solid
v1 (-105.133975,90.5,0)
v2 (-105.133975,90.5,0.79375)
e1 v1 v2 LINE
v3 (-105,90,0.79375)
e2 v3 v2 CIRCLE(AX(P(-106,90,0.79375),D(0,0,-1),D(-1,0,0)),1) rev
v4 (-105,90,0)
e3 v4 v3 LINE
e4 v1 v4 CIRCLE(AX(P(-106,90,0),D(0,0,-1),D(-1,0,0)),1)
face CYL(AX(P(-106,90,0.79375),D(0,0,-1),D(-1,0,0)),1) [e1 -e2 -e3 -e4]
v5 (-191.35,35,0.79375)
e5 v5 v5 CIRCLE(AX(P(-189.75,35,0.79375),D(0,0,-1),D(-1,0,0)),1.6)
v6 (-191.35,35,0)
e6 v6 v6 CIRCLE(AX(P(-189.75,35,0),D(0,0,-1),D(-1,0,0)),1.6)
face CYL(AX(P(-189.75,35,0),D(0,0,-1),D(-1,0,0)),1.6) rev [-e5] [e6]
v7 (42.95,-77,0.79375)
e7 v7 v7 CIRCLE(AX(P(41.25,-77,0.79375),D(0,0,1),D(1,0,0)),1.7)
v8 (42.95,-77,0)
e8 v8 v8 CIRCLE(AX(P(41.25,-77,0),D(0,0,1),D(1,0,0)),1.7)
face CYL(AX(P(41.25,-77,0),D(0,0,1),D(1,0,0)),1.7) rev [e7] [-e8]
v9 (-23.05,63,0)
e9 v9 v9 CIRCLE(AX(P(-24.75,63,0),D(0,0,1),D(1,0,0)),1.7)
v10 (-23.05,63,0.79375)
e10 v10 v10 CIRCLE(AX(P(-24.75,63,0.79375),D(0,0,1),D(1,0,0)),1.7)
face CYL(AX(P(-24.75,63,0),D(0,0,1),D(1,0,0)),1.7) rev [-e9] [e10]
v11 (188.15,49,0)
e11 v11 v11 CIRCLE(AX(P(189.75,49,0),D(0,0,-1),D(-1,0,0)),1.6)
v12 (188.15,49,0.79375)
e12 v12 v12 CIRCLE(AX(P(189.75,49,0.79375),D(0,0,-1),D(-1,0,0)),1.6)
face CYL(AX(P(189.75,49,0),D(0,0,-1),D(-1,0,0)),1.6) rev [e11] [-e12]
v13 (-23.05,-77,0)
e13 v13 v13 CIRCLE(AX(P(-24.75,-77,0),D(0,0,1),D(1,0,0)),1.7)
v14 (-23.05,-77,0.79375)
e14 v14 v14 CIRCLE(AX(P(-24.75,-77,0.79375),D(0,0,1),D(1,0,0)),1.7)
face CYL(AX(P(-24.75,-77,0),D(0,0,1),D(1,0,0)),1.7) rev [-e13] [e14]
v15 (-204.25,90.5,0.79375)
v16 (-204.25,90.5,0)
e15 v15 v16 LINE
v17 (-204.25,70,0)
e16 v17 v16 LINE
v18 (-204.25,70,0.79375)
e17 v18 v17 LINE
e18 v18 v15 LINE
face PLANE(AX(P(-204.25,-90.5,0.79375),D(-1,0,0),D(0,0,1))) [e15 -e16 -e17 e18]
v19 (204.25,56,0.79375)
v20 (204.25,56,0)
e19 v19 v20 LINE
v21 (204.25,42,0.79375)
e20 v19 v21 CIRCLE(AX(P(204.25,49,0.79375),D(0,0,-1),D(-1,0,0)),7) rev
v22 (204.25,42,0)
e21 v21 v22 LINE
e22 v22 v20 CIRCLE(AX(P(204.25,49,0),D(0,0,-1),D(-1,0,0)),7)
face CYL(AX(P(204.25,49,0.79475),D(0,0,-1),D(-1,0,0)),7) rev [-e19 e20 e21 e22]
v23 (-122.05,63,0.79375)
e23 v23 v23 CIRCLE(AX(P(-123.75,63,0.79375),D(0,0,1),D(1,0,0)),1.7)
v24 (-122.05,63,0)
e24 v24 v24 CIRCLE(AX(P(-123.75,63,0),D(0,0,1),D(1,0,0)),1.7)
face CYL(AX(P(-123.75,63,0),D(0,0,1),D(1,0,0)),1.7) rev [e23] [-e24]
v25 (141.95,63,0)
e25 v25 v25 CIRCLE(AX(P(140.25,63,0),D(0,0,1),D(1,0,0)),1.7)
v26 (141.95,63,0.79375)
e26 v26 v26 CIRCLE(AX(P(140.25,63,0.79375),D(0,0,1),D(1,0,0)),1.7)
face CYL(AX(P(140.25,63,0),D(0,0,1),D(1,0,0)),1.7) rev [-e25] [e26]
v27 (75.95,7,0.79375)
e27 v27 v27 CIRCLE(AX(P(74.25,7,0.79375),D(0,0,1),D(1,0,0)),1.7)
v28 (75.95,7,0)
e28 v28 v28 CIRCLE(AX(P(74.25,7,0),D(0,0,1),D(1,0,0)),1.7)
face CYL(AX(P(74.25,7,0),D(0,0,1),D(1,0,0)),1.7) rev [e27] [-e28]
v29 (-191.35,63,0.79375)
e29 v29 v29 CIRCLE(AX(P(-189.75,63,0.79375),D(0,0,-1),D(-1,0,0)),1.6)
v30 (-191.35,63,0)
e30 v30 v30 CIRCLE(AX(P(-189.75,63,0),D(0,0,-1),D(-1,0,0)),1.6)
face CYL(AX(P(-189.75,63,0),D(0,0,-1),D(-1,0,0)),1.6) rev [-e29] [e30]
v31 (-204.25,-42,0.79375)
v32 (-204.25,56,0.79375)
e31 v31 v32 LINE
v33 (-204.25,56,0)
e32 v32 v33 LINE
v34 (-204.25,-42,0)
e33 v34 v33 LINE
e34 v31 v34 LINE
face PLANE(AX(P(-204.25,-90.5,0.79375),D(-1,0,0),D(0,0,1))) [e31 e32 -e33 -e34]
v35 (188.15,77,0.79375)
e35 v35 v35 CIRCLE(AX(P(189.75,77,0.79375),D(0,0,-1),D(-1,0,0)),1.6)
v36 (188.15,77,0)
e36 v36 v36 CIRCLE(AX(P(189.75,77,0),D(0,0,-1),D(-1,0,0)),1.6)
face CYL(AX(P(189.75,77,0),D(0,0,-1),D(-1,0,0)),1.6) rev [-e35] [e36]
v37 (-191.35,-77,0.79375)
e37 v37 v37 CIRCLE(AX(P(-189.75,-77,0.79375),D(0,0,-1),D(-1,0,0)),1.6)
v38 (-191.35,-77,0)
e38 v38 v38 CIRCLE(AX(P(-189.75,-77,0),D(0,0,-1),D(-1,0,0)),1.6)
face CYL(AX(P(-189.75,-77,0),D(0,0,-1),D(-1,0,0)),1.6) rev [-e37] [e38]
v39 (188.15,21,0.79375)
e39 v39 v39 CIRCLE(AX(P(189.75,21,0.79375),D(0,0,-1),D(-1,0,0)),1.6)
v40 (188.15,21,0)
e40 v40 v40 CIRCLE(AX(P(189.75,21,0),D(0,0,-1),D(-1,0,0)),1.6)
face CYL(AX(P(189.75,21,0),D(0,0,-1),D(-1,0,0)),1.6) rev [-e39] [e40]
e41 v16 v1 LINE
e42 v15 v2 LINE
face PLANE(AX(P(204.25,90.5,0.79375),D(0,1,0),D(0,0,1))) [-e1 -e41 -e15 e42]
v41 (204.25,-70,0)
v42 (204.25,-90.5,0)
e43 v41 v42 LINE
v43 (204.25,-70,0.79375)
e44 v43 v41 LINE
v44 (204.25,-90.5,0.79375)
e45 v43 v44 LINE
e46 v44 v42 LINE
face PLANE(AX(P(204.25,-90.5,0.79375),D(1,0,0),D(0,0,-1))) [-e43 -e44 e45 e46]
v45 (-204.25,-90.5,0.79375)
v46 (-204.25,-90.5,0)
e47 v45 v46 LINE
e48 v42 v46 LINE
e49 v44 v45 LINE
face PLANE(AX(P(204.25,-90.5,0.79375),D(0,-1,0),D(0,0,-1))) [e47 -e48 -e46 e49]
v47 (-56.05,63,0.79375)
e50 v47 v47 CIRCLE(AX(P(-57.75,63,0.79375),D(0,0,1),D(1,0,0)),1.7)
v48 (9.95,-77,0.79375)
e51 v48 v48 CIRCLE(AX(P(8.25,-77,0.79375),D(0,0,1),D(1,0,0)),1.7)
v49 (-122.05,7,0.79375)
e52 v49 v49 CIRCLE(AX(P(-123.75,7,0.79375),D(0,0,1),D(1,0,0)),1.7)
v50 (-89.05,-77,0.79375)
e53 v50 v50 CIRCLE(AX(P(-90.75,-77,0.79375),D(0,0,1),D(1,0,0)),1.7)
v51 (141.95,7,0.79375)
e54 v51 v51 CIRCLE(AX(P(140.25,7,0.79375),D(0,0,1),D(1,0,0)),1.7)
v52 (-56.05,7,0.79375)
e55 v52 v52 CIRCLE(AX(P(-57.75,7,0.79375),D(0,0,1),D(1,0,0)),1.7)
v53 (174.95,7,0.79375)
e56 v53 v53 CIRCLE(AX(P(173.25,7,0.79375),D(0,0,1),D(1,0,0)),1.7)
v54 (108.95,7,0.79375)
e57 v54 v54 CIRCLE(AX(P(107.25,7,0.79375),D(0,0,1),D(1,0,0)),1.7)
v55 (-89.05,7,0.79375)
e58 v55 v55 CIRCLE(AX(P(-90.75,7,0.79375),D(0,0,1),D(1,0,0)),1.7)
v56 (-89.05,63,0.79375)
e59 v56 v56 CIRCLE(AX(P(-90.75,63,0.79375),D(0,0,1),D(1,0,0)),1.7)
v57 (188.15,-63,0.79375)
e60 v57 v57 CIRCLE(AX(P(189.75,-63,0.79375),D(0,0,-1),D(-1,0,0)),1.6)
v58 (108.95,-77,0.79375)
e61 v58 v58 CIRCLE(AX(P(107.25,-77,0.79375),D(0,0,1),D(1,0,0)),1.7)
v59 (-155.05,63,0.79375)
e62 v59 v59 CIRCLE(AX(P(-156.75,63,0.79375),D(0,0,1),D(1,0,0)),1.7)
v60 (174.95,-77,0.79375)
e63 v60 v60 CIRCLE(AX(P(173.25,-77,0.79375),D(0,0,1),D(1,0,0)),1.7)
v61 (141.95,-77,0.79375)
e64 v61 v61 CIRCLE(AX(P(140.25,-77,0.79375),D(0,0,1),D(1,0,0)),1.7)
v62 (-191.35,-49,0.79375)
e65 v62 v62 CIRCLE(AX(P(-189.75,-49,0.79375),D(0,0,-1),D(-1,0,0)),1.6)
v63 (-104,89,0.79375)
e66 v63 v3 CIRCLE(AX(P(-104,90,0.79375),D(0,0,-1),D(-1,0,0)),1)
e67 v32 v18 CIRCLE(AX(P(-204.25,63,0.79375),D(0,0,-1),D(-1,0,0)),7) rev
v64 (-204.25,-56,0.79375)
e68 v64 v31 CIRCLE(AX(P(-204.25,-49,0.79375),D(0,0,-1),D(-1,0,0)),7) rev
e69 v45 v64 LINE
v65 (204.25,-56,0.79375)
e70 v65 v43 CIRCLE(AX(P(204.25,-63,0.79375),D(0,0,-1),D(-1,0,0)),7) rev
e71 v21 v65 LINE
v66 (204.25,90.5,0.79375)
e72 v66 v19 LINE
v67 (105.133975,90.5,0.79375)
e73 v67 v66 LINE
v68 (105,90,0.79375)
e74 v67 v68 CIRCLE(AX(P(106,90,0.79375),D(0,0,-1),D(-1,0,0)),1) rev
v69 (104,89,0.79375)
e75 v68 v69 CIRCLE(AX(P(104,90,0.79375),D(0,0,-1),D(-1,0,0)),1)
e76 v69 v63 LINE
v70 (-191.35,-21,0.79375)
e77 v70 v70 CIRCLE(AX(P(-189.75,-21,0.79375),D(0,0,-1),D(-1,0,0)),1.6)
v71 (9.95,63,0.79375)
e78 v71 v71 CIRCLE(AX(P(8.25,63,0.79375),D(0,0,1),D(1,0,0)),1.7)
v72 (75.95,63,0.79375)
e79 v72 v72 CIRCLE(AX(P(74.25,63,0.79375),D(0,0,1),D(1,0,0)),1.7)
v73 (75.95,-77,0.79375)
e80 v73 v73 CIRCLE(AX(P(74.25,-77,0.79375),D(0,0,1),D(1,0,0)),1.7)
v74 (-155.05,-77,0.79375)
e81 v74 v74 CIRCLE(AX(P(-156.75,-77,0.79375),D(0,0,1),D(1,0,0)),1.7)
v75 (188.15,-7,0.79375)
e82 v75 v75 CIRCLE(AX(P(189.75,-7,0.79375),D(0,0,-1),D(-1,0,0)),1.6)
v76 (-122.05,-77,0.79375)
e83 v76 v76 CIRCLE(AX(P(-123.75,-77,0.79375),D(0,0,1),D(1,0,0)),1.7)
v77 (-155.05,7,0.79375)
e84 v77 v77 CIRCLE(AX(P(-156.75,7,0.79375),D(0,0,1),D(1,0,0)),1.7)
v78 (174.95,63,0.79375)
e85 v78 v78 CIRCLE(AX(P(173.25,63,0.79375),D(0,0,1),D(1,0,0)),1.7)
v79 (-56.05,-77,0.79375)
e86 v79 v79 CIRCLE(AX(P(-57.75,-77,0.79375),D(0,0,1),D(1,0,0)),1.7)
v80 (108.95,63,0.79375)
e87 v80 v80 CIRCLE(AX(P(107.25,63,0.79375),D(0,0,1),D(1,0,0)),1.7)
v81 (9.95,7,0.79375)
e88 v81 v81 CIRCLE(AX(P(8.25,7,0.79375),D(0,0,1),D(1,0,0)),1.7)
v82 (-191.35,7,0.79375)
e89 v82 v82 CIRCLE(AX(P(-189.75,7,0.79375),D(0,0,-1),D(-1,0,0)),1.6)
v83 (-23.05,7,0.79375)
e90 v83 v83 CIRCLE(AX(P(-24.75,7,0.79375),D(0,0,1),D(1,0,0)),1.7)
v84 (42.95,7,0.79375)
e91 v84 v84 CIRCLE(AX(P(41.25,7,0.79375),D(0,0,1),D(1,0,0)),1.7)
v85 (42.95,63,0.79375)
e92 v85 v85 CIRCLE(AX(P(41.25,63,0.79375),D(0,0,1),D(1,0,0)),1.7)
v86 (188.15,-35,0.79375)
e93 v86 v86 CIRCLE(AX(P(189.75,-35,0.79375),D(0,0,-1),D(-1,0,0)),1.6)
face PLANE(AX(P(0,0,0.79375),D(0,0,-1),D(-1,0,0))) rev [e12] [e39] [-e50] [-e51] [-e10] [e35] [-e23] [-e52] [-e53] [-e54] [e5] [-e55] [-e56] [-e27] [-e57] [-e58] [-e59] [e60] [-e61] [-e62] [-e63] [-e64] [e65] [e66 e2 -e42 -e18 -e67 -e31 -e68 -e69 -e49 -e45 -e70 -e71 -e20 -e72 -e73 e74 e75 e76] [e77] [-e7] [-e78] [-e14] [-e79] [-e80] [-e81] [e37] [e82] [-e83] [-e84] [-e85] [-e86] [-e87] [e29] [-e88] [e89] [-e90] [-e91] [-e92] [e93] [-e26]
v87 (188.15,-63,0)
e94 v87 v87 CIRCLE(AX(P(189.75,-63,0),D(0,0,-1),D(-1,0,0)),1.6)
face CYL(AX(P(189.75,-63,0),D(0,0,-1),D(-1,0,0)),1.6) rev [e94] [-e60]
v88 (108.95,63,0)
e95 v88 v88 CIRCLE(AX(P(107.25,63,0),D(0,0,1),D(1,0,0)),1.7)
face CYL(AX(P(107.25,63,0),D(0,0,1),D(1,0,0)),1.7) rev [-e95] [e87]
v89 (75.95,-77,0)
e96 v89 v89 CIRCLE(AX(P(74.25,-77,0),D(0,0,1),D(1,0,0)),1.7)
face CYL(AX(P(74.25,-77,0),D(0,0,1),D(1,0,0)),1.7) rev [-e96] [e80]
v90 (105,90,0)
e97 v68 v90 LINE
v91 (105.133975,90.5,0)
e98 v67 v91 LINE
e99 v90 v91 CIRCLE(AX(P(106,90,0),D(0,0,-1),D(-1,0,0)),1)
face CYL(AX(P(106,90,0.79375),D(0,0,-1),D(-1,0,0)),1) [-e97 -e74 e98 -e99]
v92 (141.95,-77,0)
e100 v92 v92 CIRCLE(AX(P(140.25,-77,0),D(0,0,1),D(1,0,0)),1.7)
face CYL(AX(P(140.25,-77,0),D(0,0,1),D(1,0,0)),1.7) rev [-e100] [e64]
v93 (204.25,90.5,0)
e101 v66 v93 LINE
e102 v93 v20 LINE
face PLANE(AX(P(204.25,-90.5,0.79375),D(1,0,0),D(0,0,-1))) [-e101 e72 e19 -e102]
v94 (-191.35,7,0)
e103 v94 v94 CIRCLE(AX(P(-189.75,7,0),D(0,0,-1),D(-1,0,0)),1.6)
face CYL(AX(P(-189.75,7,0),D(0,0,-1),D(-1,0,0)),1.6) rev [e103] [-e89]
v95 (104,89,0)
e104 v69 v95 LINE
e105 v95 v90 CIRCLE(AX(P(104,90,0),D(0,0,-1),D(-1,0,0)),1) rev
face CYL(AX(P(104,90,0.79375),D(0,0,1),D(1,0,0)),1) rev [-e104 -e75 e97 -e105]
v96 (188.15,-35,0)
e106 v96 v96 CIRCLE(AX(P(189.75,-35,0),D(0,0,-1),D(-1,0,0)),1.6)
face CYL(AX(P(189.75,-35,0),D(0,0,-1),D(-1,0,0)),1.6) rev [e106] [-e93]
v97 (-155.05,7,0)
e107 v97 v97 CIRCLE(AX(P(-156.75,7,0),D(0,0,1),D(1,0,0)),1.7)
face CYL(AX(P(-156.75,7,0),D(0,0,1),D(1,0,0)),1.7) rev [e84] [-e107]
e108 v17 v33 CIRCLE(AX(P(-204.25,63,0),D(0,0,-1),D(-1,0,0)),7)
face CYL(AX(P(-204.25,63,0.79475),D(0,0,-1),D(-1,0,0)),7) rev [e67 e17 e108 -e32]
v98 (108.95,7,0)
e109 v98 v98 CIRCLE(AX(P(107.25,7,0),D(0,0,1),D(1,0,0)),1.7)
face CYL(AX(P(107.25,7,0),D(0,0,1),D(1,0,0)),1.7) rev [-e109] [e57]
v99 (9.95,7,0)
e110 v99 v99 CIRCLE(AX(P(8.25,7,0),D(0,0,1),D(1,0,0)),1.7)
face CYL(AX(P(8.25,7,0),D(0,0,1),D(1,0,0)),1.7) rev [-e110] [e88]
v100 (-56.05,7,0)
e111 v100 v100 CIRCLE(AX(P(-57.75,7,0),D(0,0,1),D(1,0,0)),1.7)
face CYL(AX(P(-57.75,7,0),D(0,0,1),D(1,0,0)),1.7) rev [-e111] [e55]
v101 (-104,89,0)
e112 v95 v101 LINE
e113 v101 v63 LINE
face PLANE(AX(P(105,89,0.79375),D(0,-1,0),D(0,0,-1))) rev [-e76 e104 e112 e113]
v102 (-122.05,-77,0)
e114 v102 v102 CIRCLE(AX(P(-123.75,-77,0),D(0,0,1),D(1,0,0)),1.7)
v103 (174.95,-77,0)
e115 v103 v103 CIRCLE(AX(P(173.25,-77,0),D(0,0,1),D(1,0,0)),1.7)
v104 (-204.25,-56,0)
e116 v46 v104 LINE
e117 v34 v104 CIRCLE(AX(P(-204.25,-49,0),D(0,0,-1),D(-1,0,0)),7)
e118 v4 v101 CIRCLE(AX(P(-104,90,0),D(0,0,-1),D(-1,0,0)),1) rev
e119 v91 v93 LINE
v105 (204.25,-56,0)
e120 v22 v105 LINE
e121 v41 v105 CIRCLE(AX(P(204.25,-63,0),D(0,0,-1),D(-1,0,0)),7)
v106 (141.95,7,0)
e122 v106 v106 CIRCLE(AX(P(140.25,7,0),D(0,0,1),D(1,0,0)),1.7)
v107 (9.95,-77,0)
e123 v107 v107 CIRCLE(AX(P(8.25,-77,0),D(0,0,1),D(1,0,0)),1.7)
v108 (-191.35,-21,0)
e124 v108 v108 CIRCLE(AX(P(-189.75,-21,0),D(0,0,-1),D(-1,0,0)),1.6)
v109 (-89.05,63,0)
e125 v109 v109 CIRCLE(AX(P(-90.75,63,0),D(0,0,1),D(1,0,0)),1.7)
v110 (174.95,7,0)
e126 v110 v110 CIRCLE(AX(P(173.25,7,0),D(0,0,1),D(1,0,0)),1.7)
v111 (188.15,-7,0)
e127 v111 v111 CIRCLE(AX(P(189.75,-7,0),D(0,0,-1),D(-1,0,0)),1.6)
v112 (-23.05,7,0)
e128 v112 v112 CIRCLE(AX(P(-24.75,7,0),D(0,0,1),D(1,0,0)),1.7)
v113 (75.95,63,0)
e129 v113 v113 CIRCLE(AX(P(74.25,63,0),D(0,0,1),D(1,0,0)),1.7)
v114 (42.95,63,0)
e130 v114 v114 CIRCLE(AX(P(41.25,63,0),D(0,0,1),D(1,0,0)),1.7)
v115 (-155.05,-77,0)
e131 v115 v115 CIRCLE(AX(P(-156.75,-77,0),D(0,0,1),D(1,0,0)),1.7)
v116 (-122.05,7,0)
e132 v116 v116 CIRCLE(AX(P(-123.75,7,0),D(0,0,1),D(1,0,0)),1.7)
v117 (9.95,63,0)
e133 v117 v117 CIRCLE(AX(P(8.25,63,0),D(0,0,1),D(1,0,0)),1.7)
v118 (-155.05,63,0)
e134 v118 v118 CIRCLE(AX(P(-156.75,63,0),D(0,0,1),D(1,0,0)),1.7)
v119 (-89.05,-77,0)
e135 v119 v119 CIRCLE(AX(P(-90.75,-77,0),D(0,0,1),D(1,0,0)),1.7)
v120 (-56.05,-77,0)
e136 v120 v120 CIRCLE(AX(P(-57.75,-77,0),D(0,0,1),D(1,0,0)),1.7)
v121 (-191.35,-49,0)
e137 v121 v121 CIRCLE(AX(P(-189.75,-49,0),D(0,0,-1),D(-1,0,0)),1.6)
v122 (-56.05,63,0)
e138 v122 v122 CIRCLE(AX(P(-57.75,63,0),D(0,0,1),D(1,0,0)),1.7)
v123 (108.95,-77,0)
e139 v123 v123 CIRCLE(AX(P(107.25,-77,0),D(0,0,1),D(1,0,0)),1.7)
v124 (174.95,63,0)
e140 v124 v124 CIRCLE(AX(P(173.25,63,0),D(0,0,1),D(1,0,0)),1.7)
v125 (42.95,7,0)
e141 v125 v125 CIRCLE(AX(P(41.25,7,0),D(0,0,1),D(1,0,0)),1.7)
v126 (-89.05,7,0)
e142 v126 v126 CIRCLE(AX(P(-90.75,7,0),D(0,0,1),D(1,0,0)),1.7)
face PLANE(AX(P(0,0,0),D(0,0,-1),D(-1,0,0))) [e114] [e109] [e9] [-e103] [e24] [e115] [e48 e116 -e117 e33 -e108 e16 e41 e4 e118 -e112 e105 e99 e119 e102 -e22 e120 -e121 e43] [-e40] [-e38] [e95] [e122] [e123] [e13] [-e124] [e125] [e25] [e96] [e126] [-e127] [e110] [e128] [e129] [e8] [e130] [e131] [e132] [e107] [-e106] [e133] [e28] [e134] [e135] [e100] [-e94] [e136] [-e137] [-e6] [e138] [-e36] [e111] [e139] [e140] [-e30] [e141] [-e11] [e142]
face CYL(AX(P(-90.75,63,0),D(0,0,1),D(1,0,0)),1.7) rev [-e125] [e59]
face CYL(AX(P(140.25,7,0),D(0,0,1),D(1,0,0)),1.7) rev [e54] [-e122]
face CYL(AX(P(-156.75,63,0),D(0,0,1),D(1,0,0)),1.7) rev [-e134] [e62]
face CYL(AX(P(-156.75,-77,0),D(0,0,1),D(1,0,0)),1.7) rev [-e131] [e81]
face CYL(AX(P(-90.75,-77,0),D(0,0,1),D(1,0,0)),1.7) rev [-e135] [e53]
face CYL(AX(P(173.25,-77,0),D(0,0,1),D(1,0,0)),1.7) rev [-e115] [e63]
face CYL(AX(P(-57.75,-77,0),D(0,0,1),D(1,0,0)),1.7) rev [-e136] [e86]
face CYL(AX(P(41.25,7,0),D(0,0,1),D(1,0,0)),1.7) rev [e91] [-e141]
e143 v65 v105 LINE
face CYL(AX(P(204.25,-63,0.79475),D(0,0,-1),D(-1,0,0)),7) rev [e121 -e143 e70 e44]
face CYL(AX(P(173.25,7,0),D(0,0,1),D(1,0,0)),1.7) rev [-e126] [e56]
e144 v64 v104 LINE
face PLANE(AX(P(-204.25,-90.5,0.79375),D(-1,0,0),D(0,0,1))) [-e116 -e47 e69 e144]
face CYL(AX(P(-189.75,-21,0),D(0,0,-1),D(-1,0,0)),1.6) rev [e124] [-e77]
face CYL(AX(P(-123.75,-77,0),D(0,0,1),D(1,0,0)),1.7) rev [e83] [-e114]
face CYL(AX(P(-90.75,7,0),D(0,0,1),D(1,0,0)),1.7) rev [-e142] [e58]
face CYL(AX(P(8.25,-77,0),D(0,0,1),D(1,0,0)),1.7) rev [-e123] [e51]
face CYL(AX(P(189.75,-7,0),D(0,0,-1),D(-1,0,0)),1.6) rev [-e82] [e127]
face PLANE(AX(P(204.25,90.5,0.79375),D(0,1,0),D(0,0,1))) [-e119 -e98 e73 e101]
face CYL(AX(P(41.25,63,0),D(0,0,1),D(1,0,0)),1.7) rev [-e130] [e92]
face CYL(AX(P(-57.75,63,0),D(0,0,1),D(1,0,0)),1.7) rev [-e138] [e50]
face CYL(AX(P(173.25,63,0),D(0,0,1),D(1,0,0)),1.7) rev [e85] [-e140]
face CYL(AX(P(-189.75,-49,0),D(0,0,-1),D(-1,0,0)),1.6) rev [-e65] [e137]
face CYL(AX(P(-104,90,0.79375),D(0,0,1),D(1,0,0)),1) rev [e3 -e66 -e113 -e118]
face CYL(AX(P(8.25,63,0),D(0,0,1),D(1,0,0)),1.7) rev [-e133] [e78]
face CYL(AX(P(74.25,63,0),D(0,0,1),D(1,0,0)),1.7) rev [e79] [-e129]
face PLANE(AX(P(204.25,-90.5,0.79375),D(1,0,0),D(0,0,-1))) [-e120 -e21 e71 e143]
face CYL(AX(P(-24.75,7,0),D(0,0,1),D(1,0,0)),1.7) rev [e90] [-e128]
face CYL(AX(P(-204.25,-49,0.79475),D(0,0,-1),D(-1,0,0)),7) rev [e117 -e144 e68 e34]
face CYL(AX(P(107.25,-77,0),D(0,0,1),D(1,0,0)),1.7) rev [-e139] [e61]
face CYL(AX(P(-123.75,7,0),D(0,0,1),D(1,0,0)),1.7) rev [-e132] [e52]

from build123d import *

# Parameters (mm, degrees)
ESQUISSE2_W                = 409.5
ESQUISSE2_H                = 182
BOSS_EXTRU_2_DEPTH         = 0.79375
ESQUISSE3_R                = 1.7
ENL_V_MAT_EXTRU_1_DEPTH    = 225.062920938
R_P_TITION_LIN_AIRE1_COUNT = 11
R_P_TITION_LIN_AIRE1_PITCH = 33
ESQUISSE4_W                = 210
ESQUISSE4_H                = 2
ENL_V_MAT_EXTRU_2_DEPTH    = 225.062920938
CONG_1_R                   = 1
ESQUISSE5_OUTSIDE_W        = 501.124
ESQUISSE5_OUTSIDE_H        = 273.624
ESQUISSE5_OUTSIDE_W_2      = 408.5
ESQUISSE5_OUTSIDE_H_2      = 181
ENL_V_MAT_EXTRU_3_DEPTH    = 225.062920938
D_GAGEMENT_M31_D           = 3.2
ENL_V_MAT_EXTRU_4_REACH    = 225.403


with BuildPart() as part:
    # Esquisse2 → Boss.-Extru.2 (new body)
    with BuildSketch(Plane.XY):
        Rectangle(ESQUISSE2_W, ESQUISSE2_H)
    extrude(amount=BOSS_EXTRU_2_DEPTH)

    # Esquisse3 → Enlèv. mat.-Extru.1 (cut, through all)
    with BuildSketch(Plane.XY.offset(0.79375)):
        with Locations((-156.75, 63)):
            Circle(ESQUISSE3_R)
        with Locations((-156.75, 7)):
            Circle(ESQUISSE3_R)
        with Locations((-156.75, -77)):
            Circle(ESQUISSE3_R)
    enl_v_mat_extru_1 = extrude(amount=-ENL_V_MAT_EXTRU_1_DEPTH, mode=Mode.SUBTRACT)

    # Répétition linéaire1: Enlèv. mat.-Extru.1 ×11
    with Locations(*[(i * R_P_TITION_LIN_AIRE1_PITCH, 0, 0) for i in range(1, R_P_TITION_LIN_AIRE1_COUNT)]):
        add(enl_v_mat_extru_1, mode=Mode.SUBTRACT)

    # Esquisse4 → Enlèv. mat.-Extru.2 (cut, through all)
    with BuildSketch(Plane(origin=(0, 0, 0), x_dir=(-1, 0, 0), z_dir=(0, 0, -1))):
        with Locations((0, 90)):
            Rectangle(ESQUISSE4_W, ESQUISSE4_H)
    extrude(amount=-ENL_V_MAT_EXTRU_2_DEPTH, mode=Mode.SUBTRACT)

    # Congé1
    cong_1_edges = [part.edges().sort_by_distance(p)[0] for p in [
        (-105, 89, 0.396875),
        (105, 89, 0.396875),
    ]]
    fillet(cong_1_edges, radius=CONG_1_R)
    cong_1_2_edges = [part.edges().sort_by_distance(p)[0] for p in [
        (-105, 91, 0.396875),
        (105, 91, 0.396875),
    ]]
    fillet(cong_1_2_edges, radius=CONG_1_R - 0.0001)  # a hair under: the kernel refuses the full size

    # Esquisse5 outside → Enlèv. mat.-Extru.3 (cut, through all)
    with BuildSketch(Plane(origin=(0, 0, 0), x_dir=(-1, 0, 0), z_dir=(0, 0, -1))):
        Rectangle(ESQUISSE5_OUTSIDE_W, ESQUISSE5_OUTSIDE_H)
        Rectangle(ESQUISSE5_OUTSIDE_W_2, ESQUISSE5_OUTSIDE_H_2, mode=Mode.SUBTRACT)
    extrude(amount=-ENL_V_MAT_EXTRU_3_DEPTH, mode=Mode.SUBTRACT)

    # Dégagement M31 (through all)
    with Locations(Plane(origin=(0, 0, 0), x_dir=(-1, 0, 0), z_dir=(0, 0, -1))):
        with Locations((-189.75, 77), (-189.75, 49), (-189.75, 21), (-189.75, -7), (-189.75, -35), (-189.75, -63), (189.75, 63), (189.75, 35), (189.75, 7), (189.75, -21), (189.75, -49), (189.75, -77)):
            Hole(D_GAGEMENT_M31_D / 2)

    # Esquisse14 → Enlèv. mat.-Extru.4 (cut, up to next)
    with BuildSketch(Plane(origin=(0, 0, 0), x_dir=(-1, 0, 0), z_dir=(0, 0, -1)), mode=Mode.PRIVATE) as enl_v_mat_extru_4_sk1:
        with BuildLine():
            Line((-204.25, -56), (-204.25, -70))
            ThreePointArc((-204.25, -70), (-197.25, -63), (-204.25, -56))
        make_face()
    enl_v_mat_extru_4_tool1 = extrude(enl_v_mat_extru_4_sk1.sketch, amount=-ENL_V_MAT_EXTRU_4_REACH, mode=Mode.PRIVATE) & part.part
    # Esquisse14 → Enlèv. mat.-Extru.4 (cut, up to next)
    with BuildSketch(Plane(origin=(0, 0, 0), x_dir=(-1, 0, 0), z_dir=(0, 0, -1)), mode=Mode.PRIVATE) as enl_v_mat_extru_4_sk2:
        with BuildLine():
            Line((-204.25, 56), (-204.25, 42))
            ThreePointArc((-204.25, 42), (-197.25, 49), (-204.25, 56))
        make_face()
    enl_v_mat_extru_4_tool2 = extrude(enl_v_mat_extru_4_sk2.sketch, amount=-ENL_V_MAT_EXTRU_4_REACH, mode=Mode.PRIVATE) & part.part
    # Esquisse14 → Enlèv. mat.-Extru.4 (cut, up to next)
    with BuildSketch(Plane(origin=(0, 0, 0), x_dir=(-1, 0, 0), z_dir=(0, 0, -1)), mode=Mode.PRIVATE) as enl_v_mat_extru_4_sk3:
        with BuildLine():
            Line((204.25, 70), (204.25, 56))
            ThreePointArc((204.25, 56), (197.25, 63), (204.25, 70))
        make_face()
    enl_v_mat_extru_4_tool3 = extrude(enl_v_mat_extru_4_sk3.sketch, amount=-ENL_V_MAT_EXTRU_4_REACH, mode=Mode.PRIVATE) & part.part
    # Esquisse14 → Enlèv. mat.-Extru.4 (cut, up to next)
    with BuildSketch(Plane(origin=(0, 0, 0), x_dir=(-1, 0, 0), z_dir=(0, 0, -1)), mode=Mode.PRIVATE) as enl_v_mat_extru_4_sk4:
        with BuildLine():
            Line((204.25, -42), (204.25, -56))
            ThreePointArc((204.25, -56), (197.25, -49), (204.25, -42))
        make_face()
    enl_v_mat_extru_4_tool4 = extrude(enl_v_mat_extru_4_sk4.sketch, amount=-ENL_V_MAT_EXTRU_4_REACH, mode=Mode.PRIVATE) & part.part
    add(enl_v_mat_extru_4_tool1.solids().sort_by_distance((201.279108, -63, 0))[0], mode=Mode.SUBTRACT)
    add(enl_v_mat_extru_4_tool2.solids().sort_by_distance((201.279108, 49, 0))[0], mode=Mode.SUBTRACT)
    add(enl_v_mat_extru_4_tool3.solids().sort_by_distance((-201.279108, 63, 0))[0], mode=Mode.SUBTRACT)
    add(enl_v_mat_extru_4_tool4.solids().sort_by_distance((-201.279108, -49, 0))[0], mode=Mode.SUBTRACT)


solid = part.part
